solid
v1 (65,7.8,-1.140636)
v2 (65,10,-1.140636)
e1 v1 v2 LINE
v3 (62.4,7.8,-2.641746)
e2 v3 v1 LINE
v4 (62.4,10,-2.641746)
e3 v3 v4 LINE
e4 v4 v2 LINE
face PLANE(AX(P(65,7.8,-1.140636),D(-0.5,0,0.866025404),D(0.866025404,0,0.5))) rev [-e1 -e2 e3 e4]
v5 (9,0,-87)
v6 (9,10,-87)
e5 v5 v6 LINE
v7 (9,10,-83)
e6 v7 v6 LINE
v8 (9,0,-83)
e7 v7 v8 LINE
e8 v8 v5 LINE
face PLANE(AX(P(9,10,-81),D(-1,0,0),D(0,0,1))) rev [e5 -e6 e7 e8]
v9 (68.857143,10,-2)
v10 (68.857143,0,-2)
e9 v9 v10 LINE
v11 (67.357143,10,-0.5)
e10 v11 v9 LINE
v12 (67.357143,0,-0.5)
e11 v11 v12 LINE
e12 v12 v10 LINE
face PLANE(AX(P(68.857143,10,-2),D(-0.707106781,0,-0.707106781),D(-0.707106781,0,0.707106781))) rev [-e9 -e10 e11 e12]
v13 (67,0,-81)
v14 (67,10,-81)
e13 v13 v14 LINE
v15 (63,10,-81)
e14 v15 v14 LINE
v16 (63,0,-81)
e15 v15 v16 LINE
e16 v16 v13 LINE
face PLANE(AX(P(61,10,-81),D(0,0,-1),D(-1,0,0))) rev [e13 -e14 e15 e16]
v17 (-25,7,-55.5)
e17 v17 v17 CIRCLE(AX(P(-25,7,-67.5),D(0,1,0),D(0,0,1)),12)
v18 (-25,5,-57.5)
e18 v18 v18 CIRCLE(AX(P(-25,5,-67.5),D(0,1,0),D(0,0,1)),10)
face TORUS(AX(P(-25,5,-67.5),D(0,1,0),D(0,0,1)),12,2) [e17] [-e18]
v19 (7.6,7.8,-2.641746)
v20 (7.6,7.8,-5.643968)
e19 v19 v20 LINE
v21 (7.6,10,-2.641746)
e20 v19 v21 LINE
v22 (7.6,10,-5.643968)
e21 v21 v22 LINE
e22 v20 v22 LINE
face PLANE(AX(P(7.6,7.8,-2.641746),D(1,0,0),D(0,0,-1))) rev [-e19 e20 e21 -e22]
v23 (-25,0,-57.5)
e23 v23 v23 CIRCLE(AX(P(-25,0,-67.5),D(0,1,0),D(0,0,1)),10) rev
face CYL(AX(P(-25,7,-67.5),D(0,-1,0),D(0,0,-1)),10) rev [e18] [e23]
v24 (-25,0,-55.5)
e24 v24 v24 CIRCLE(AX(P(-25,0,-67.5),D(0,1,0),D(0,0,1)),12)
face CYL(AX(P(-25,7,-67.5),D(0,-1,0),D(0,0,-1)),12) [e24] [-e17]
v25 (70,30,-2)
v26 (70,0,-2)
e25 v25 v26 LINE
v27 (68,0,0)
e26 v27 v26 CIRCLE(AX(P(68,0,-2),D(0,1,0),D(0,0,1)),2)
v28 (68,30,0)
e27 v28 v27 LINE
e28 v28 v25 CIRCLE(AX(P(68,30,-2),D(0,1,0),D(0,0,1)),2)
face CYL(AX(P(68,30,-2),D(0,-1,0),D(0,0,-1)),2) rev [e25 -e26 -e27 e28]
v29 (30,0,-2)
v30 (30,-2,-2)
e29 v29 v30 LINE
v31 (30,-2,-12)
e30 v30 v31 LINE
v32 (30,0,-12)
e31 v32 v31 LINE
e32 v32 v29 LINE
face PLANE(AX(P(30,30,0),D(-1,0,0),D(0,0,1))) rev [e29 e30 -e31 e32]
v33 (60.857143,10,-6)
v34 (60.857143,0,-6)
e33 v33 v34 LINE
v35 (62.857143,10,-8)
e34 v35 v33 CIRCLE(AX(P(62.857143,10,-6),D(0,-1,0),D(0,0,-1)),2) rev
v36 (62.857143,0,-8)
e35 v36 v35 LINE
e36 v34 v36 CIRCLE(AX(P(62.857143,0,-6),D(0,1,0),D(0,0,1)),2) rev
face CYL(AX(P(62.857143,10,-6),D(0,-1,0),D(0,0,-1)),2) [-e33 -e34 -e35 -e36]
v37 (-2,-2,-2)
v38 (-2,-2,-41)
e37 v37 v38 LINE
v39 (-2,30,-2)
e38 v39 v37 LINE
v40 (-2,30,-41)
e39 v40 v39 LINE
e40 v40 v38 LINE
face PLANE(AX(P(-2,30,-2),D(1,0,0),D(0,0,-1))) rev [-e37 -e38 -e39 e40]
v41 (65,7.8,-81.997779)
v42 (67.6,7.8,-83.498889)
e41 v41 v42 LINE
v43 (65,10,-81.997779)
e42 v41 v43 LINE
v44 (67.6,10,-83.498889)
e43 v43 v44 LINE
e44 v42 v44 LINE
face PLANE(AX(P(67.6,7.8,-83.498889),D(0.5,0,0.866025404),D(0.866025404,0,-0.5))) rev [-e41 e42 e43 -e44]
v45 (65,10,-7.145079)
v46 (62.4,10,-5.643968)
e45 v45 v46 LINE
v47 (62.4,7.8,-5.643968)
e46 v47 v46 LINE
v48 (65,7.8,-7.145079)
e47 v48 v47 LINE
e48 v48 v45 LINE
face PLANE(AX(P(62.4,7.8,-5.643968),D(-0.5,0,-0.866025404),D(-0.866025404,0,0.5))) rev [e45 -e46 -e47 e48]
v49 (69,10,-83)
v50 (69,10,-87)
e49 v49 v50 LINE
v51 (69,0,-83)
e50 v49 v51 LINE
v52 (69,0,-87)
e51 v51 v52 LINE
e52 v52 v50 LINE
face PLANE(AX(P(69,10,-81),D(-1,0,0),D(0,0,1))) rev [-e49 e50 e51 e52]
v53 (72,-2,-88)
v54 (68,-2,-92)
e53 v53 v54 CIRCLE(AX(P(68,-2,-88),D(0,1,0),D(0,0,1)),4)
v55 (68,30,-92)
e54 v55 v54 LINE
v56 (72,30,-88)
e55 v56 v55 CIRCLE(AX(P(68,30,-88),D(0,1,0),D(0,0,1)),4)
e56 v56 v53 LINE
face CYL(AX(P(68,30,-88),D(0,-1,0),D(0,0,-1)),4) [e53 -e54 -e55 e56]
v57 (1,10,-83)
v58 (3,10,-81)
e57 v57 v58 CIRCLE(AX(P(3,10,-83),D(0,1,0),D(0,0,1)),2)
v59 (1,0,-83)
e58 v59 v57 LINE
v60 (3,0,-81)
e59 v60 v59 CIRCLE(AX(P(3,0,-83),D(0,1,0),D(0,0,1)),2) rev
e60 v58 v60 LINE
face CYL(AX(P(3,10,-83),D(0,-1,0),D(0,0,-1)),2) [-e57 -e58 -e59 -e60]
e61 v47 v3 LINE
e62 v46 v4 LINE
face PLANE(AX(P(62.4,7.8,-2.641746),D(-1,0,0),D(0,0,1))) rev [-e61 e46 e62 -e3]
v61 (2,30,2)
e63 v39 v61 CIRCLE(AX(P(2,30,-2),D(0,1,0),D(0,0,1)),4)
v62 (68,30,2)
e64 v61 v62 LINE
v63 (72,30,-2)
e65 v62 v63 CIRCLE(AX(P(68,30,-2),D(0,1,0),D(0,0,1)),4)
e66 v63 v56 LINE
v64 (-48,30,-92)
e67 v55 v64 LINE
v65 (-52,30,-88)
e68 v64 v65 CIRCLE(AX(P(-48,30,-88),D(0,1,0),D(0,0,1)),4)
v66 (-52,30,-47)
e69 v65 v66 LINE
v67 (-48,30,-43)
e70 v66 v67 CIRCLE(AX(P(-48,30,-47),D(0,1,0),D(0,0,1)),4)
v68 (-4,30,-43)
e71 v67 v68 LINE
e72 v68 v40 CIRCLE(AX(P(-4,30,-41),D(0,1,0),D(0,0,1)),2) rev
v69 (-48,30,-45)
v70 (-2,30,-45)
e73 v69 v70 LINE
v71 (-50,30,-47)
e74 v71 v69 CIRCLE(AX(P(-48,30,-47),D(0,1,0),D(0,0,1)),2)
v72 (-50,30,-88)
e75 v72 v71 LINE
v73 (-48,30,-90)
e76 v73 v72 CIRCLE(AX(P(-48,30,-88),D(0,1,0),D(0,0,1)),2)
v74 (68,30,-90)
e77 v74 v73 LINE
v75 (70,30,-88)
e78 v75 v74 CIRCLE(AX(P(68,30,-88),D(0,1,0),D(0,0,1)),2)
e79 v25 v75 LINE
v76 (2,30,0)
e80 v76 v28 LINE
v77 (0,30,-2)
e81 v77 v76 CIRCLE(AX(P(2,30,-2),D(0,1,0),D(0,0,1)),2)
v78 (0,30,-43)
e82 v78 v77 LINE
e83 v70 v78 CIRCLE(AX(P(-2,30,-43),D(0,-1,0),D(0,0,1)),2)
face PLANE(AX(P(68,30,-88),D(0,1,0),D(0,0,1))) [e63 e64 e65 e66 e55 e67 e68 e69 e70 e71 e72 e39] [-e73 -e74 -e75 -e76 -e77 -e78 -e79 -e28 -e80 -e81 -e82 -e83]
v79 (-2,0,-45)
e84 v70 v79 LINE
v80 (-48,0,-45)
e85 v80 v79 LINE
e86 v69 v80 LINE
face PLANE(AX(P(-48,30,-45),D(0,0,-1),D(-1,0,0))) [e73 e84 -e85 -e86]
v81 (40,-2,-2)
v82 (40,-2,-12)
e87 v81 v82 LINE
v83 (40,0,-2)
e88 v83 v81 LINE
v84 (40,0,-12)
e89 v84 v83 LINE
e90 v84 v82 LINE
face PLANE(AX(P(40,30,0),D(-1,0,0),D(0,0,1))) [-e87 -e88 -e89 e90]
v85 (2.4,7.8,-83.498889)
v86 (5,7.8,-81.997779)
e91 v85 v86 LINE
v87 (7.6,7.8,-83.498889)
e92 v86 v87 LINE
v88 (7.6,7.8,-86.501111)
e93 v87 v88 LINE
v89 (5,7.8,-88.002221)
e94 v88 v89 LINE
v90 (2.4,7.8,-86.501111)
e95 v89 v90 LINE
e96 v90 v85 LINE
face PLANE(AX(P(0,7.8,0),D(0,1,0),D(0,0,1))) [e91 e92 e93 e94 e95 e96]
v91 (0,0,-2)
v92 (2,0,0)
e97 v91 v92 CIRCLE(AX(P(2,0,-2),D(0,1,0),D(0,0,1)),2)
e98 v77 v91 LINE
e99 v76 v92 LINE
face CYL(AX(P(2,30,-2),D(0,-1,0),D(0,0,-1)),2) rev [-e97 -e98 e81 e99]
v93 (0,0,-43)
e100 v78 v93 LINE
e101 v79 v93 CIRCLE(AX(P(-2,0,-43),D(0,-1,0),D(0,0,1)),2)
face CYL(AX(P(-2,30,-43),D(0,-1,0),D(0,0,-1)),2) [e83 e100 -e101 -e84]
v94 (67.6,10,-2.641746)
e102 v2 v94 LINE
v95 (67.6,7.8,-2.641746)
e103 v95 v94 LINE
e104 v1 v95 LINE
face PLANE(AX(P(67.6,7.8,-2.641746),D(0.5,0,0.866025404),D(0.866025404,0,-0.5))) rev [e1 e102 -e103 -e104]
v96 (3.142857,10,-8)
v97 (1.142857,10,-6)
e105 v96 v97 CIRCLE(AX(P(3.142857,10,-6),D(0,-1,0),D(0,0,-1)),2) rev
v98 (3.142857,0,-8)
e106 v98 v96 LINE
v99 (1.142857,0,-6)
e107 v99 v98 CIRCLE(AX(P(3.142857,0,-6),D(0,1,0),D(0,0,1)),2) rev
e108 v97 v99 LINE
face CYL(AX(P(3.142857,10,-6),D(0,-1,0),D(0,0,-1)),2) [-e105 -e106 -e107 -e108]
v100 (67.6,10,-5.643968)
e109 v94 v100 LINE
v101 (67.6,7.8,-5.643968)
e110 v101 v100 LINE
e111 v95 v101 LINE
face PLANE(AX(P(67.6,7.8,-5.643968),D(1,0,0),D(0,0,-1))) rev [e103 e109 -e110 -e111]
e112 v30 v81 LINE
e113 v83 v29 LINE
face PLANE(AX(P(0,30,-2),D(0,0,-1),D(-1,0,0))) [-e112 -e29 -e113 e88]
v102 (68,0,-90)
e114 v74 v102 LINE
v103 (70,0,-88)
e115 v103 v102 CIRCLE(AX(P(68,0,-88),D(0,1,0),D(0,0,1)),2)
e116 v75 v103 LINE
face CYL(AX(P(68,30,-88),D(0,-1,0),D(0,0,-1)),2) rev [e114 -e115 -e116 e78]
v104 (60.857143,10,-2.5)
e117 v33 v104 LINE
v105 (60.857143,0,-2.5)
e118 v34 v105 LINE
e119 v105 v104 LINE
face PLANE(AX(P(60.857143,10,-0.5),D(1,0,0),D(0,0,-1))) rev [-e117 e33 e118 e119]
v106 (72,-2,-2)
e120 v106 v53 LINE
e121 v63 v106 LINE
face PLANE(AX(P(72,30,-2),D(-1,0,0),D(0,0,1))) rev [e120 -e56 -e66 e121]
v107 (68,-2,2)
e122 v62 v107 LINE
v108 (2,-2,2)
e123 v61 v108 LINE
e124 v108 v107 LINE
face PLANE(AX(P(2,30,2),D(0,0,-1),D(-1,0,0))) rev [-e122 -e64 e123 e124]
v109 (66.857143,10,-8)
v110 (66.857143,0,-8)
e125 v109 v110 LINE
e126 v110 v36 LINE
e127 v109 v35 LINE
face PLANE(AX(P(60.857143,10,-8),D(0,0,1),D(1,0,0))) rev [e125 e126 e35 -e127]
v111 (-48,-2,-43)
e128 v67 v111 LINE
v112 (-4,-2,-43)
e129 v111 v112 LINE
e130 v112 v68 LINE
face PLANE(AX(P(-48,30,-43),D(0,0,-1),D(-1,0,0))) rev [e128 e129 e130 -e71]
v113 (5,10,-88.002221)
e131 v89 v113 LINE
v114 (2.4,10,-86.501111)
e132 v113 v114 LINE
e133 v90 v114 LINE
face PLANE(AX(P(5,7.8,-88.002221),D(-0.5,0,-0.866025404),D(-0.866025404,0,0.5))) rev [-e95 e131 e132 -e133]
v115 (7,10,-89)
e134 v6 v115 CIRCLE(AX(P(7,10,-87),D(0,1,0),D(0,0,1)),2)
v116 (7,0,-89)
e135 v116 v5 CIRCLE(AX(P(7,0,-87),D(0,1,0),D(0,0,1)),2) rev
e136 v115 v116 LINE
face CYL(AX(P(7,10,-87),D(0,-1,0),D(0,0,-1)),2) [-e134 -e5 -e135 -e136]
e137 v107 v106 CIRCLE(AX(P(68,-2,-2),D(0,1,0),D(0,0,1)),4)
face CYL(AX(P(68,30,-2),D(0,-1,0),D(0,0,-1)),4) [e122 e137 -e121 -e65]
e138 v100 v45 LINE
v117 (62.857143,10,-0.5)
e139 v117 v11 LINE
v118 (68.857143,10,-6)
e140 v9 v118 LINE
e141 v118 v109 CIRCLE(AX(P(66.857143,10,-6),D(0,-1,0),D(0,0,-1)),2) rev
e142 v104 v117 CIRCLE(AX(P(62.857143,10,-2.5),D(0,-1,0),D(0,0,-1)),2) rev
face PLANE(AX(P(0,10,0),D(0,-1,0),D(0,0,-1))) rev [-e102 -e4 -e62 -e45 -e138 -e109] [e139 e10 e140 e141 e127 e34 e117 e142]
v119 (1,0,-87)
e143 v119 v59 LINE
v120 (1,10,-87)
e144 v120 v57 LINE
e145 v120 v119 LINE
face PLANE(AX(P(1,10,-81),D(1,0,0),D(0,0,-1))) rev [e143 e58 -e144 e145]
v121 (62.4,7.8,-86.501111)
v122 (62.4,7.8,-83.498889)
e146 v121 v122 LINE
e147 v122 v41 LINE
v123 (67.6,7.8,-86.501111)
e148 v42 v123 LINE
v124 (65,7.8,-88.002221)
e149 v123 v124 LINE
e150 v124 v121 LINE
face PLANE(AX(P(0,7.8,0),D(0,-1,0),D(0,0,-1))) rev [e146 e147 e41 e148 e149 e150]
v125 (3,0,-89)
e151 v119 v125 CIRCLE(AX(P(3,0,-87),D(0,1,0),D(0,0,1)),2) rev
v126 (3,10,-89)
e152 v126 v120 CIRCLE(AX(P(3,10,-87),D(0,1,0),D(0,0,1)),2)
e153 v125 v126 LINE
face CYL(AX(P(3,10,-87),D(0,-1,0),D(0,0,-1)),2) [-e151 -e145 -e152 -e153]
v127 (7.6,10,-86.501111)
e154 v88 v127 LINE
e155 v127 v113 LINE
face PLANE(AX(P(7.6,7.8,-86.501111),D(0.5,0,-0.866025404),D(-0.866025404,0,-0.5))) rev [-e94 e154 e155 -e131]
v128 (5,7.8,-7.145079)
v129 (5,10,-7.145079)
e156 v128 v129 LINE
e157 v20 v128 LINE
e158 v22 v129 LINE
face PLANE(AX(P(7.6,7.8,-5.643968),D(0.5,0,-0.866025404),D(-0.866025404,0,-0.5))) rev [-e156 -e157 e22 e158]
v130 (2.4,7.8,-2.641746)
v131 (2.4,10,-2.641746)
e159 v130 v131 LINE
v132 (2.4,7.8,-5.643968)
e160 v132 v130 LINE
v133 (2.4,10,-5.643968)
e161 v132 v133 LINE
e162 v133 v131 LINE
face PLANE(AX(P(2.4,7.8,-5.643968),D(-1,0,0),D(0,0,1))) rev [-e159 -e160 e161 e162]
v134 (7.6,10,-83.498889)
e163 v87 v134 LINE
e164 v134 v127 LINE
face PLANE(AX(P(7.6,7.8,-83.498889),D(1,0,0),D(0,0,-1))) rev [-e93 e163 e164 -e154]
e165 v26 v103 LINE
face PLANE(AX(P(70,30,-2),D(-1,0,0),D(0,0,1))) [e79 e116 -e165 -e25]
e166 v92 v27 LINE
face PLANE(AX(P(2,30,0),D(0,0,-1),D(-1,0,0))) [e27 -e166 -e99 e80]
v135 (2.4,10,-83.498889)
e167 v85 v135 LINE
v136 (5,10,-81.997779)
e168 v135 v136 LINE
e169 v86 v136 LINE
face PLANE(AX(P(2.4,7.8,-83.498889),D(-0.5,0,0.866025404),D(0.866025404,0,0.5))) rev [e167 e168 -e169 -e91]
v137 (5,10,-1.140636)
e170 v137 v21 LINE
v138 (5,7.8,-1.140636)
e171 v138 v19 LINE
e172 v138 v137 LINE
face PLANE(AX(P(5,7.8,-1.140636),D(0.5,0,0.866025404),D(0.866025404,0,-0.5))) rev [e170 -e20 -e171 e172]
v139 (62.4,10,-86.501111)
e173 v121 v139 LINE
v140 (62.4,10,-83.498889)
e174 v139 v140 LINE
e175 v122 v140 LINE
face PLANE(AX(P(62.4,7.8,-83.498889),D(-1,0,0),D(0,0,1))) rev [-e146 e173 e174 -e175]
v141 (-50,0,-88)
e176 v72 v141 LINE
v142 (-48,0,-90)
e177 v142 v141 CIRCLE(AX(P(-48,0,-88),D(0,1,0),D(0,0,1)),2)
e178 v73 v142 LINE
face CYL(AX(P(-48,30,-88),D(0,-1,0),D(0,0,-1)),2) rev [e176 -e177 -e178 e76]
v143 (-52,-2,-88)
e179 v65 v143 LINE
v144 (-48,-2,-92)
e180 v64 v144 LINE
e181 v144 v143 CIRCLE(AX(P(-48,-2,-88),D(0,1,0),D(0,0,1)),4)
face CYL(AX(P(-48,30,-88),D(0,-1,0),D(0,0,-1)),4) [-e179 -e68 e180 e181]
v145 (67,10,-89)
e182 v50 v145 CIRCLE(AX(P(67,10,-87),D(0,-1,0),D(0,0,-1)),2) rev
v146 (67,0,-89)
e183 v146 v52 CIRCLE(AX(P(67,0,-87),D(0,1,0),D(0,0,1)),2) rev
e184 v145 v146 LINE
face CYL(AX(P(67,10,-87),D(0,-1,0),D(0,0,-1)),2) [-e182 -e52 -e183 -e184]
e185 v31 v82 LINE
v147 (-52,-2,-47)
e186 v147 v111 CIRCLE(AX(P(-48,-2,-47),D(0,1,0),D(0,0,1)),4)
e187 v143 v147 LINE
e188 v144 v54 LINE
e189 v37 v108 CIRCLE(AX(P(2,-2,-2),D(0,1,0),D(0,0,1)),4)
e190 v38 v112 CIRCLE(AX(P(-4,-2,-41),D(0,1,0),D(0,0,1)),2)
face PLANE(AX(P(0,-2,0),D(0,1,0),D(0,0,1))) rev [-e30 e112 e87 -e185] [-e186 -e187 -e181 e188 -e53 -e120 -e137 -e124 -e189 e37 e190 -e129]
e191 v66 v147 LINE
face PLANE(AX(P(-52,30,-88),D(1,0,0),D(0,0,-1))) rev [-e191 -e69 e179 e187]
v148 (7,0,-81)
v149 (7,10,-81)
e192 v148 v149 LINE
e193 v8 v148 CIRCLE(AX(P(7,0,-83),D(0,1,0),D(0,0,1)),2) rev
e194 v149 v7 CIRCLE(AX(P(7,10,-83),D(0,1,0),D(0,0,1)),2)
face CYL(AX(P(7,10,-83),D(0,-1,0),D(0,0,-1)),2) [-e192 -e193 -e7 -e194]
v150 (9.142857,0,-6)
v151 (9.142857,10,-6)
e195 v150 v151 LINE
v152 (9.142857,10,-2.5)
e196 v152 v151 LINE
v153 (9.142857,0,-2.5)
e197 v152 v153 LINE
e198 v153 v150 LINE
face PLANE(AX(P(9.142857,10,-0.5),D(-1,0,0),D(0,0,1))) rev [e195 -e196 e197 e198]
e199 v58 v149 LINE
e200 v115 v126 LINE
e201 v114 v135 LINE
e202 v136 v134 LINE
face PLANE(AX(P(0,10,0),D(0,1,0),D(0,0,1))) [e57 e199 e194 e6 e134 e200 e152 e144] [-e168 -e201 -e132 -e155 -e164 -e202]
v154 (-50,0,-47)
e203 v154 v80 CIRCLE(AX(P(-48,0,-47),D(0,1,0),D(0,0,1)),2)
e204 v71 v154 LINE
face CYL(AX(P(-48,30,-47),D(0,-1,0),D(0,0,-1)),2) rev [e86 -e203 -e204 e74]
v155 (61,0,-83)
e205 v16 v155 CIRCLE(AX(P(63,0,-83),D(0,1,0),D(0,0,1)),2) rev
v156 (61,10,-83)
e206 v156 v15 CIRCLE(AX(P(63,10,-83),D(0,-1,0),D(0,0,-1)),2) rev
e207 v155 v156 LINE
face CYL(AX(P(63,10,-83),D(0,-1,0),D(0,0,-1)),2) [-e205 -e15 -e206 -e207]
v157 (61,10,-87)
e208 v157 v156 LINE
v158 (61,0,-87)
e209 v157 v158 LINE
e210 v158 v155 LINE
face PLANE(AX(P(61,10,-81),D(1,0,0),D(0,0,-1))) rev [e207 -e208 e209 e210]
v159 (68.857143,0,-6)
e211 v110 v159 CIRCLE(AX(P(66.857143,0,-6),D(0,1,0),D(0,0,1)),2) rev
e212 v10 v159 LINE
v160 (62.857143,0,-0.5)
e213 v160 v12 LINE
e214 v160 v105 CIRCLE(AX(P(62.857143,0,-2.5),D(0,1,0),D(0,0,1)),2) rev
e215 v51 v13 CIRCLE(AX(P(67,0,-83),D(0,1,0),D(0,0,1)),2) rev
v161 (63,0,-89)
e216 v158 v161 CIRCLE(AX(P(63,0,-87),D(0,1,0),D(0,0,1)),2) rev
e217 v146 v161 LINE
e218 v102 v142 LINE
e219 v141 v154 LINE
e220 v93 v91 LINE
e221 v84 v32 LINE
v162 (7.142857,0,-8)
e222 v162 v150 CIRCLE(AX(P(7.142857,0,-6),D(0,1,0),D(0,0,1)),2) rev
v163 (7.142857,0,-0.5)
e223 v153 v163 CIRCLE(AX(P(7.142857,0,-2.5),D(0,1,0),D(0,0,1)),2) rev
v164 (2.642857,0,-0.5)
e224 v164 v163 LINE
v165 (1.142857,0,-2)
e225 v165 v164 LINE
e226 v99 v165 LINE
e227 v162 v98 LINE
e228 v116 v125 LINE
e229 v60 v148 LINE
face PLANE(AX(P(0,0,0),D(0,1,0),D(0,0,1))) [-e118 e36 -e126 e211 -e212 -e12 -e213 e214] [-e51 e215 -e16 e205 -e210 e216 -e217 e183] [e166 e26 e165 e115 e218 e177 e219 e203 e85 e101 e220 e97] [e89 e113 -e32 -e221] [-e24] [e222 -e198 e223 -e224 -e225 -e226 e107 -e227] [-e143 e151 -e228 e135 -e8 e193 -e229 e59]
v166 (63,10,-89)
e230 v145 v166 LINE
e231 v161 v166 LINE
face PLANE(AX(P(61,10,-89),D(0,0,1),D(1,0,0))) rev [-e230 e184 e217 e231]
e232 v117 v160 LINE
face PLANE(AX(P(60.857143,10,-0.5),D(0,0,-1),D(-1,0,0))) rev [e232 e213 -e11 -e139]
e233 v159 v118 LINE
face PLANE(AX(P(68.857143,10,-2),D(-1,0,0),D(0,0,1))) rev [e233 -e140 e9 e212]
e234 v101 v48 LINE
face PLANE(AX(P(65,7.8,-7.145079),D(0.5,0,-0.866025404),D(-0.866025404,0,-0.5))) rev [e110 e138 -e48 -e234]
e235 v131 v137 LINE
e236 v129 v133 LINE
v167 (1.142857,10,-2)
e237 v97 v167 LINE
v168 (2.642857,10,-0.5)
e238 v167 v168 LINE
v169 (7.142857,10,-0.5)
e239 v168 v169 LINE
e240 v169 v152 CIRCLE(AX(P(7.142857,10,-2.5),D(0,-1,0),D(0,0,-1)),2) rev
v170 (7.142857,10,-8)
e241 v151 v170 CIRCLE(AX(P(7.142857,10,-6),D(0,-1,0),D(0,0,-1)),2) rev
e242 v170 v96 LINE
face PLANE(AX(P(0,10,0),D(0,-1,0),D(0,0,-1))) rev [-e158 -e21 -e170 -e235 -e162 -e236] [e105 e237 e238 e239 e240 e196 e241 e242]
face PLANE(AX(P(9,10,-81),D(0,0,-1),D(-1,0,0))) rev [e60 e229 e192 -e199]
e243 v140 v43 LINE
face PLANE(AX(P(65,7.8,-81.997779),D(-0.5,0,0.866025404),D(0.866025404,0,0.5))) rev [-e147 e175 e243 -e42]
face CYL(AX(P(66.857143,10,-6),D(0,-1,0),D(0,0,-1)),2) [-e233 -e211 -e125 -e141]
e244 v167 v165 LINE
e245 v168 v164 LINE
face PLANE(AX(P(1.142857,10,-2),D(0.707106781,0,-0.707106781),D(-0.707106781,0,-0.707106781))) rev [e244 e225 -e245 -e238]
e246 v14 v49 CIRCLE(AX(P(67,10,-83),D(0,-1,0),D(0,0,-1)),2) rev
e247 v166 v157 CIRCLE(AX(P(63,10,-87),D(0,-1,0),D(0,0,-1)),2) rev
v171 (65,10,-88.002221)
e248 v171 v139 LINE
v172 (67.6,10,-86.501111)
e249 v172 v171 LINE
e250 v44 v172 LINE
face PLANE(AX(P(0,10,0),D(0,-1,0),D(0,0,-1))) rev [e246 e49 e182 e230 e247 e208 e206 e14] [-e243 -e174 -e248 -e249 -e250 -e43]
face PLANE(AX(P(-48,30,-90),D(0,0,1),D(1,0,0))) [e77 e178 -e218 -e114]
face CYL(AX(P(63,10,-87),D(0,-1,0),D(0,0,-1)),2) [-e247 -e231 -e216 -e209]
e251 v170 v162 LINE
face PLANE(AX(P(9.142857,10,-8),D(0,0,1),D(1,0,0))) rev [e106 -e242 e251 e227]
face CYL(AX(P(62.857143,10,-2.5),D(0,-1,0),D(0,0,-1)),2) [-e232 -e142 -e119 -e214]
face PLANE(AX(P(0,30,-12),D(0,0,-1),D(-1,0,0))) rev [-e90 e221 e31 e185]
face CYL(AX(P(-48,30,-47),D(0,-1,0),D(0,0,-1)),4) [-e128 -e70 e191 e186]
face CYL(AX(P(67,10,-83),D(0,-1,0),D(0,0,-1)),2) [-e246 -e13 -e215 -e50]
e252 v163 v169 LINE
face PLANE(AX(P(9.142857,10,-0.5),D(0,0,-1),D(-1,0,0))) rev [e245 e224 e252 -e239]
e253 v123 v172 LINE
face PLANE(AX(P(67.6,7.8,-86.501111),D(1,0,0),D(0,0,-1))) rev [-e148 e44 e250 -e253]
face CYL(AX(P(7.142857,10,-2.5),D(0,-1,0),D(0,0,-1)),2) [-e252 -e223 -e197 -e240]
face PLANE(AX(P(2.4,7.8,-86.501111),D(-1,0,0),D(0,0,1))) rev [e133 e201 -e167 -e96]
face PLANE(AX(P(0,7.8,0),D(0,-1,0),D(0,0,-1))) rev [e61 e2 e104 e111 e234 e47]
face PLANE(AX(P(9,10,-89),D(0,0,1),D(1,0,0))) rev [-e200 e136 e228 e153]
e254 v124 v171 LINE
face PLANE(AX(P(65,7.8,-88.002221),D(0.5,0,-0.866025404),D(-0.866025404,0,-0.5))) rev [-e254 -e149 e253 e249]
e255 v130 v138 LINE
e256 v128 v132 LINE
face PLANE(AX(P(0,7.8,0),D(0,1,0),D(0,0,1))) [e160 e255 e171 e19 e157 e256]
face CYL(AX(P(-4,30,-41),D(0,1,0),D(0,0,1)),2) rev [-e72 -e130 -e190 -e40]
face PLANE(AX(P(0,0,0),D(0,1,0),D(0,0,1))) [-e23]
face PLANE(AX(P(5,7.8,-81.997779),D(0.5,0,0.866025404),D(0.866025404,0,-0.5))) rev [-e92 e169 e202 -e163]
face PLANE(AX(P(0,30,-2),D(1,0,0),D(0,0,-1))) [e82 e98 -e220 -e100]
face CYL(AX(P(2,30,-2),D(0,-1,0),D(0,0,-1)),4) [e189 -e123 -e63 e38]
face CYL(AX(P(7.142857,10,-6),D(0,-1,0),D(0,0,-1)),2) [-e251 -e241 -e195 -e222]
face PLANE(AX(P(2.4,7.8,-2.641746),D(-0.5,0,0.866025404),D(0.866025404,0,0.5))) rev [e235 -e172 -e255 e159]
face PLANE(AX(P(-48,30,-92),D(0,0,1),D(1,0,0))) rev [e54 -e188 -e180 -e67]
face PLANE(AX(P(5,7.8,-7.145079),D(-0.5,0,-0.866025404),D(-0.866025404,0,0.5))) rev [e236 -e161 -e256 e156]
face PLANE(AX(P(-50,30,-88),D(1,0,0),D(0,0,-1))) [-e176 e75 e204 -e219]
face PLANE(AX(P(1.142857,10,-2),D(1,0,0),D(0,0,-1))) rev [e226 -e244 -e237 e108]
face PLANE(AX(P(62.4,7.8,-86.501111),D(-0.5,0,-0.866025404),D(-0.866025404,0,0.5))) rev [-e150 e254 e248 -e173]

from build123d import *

# Parameters (mm, degrees)
BOSS_EXTRUDE1_DEPTH = 30
BOSS_EXTRUDE2_DEPTH = 2
SKETCH5_R           = 12
SKETCH5_R_2         = 10
BOSS_EXTRUDE3_DEPTH = 7
SKETCH6_W           = 8
SKETCH6_H           = 8
BOSS_EXTRUDE4_DEPTH = 10
CUT_EXTRUDE1_START  = 10
CUT_EXTRUDE1_DEPTH  = 2.2
FILLET1_R           = 2
SKETCH8_W           = 10
SKETCH8_H           = 10
CUT_EXTRUDE3_DEPTH  = 122.128031438


with BuildPart() as part:
    # Sketch2 → Boss-Extrude1 (new body)
    with BuildSketch(Plane(origin=(0, 0, 0), x_dir=(1, 0, 0), z_dir=(0, 1, 0))):
        with BuildLine():
            Line((72, 2), (72, 88))
            ThreePointArc((72, 88), (70.828427125, 90.828427125), (68, 92))
            Line((68, 92), (-48, 92))
            ThreePointArc((-48, 92), (-50.828427125, 90.828427125), (-52, 88))
            Line((-52, 88), (-52, 47))
            ThreePointArc((-52, 47), (-50.828427125, 44.171572875), (-48, 43))
            Line((-48, 43), (-2, 43))
            Line((-2, 43), (-2, 2))
            ThreePointArc((-2, 2), (-0.828427125, -0.828427125), (2, -2))
            Line((2, -2), (68, -2))
            ThreePointArc((68, -2), (70.828427125, -0.828427125), (72, 2))
        make_face()
        with BuildLine():
            Line((70, 2), (70, 88))
            ThreePointArc((70, 88), (69.414213562, 89.414213562), (68, 90))
            Line((68, 90), (-48, 90))
            ThreePointArc((-48, 90), (-49.414213562, 89.414213562), (-50, 88))
            Line((-50, 88), (-50, 47))
            ThreePointArc((-50, 47), (-49.414213562, 45.585786438), (-48, 45))
            Line((-48, 45), (-2, 45))
            ThreePointArc((-2, 45), (-0.585786438, 44.414213562), (0, 43))
            Line((0, 43), (0, 2))
            ThreePointArc((0, 2), (0.585786438, 0.585786438), (2, 0))
            Line((2, 0), (68, 0))
            ThreePointArc((68, 0), (69.414213562, 0.585786438), (70, 2))
        make_face(mode=Mode.SUBTRACT)
    extrude(amount=BOSS_EXTRUDE1_DEPTH)



with BuildPart() as body_2:
    # Sketch3 → Boss-Extrude2 (new body)
    # profile 1 of 2: a face of its own
    with BuildSketch(Plane(origin=(0, 0, 0), x_dir=(1, 0, 0), z_dir=(0, 1, 0))):
        with BuildLine():
            Line((-48, 92), (68, 92))
            ThreePointArc((68, 92), (70.828427125, 90.828427125), (72, 88))
            Line((72, 88), (72, 2))
            ThreePointArc((72, 2), (70.828427125, -0.828427125), (68, -2))
            Line((68, -2), (2, -2))
            ThreePointArc((2, -2), (-0.828427125, -0.828427125), (-2, 2))
            Line((-2, 2), (-2, 43))
            Line((-2, 43), (-48, 43))
            ThreePointArc((-48, 43), (-50.828427125, 44.171572875), (-52, 47))
            Line((-52, 47), (-52, 88))
            ThreePointArc((-52, 88), (-50.828427125, 90.828427125), (-48, 92))
        make_face()
        with BuildLine():
            Line((0, 43), (0, 2))
            ThreePointArc((0, 2), (0.585786438, 0.585786438), (2, 0))
            Line((2, 0), (68, 0))
            ThreePointArc((68, 0), (69.414213562, 0.585786438), (70, 2))
            Line((70, 2), (70, 88))
            ThreePointArc((70, 88), (69.414213562, 89.414213562), (68, 90))
            Line((68, 90), (-48, 90))
            ThreePointArc((-48, 90), (-49.414213562, 89.414213562), (-50, 88))
            Line((-50, 88), (-50, 47))
            ThreePointArc((-50, 47), (-49.414213562, 45.585786438), (-48, 45))
            Line((-48, 45), (-2, 45))
            ThreePointArc((-2, 45), (-0.585786438, 44.414213562), (0, 43))
        make_face(mode=Mode.SUBTRACT)
    # profile 2 of 2: a face of its own
    with BuildSketch(Plane(origin=(0, 0, 0), x_dir=(1, 0, 0), z_dir=(0, 1, 0))):
        with BuildLine():
            ThreePointArc((0, 43), (-0.585786438, 44.414213562), (-2, 45))
            Line((-2, 45), (-48, 45))
            ThreePointArc((-48, 45), (-49.414213562, 45.585786438), (-50, 47))
            Line((-50, 47), (-50, 88))
            ThreePointArc((-50, 88), (-49.414213562, 89.414213562), (-48, 90))
            Line((-48, 90), (68, 90))
            ThreePointArc((68, 90), (69.414213562, 89.414213562), (70, 88))
            Line((70, 88), (70, 2))
            ThreePointArc((70, 2), (69.414213562, 0.585786438), (68, 0))
            Line((68, 0), (2, 0))
            ThreePointArc((2, 0), (0.585786438, 0.585786438), (0, 2))
            Line((0, 2), (0, 43))
        make_face()
    extrude(amount=-BOSS_EXTRUDE2_DEPTH)


with BuildPart() as part_1:
    add(part.part)

    add(body_2.part)  # Boss-Extrude3 merges body 2
    # Sketch5 → Boss-Extrude3 (add)
    with BuildSketch(Plane(origin=(0, 0, 0), x_dir=(1, 0, 0), z_dir=(0, 1, 0))):
        with Locations(Location((-25, 67.5, 0), (0, 0, 270))):
            Circle(SKETCH5_R)
        with Locations(Location((-25, 67.5, 0), (0, 0, 270))):
            Circle(SKETCH5_R_2, mode=Mode.SUBTRACT)
    extrude(amount=BOSS_EXTRUDE3_DEPTH)

    # Sketch6 → Boss-Extrude4 (add)
    with BuildSketch(Plane(origin=(0, 0, 0), x_dir=(1, 0, 0), z_dir=(0, 1, 0))):
        with Locations((65, 85)):
            Rectangle(SKETCH6_W, SKETCH6_H)
        Polygon((60.857142857, 8), (68.857142857, 8), (68.857142857, 2), (67.357142857, 0.5), (60.857142857, 0.5), align=None)
        Polygon((9.142857143, 0.5), (9.142857143, 8), (1.142857143, 8), (1.142857143, 2), (2.642857143, 0.5), align=None)
        with Locations((5, 85)):
            Rectangle(SKETCH6_W, SKETCH6_H)
    extrude(amount=BOSS_EXTRUDE4_DEPTH)

    # Sketch7 → Cut-Extrude1 (cut)
    with BuildSketch(Plane(origin=(0, 0, 0), x_dir=(1, 0, 0), z_dir=(0, 1, 0)).offset(CUT_EXTRUDE1_START)):
        Polygon((2.4, 86.5011107), (2.4, 83.4988893), (5, 81.9977786), (7.6, 83.4988893), (7.6, 86.5011107), (5, 88.0022214), align=None)
        Polygon((2.4, 5.643967843), (2.4, 2.641746443), (5, 1.140635743), (7.6, 2.641746443), (7.6, 5.643967843), (5, 7.145078543), align=None)
        Polygon((65, 1.140635743), (62.4, 2.641746443), (62.4, 5.643967843), (65, 7.145078543), (67.6, 5.643967843), (67.6, 2.641746443), align=None)
        Polygon((62.4, 86.5011107), (65, 88.0022214), (67.6, 86.5011107), (67.6, 83.4988893), (65, 81.9977786), (62.4, 83.4988893), align=None)
    extrude(amount=-CUT_EXTRUDE1_DEPTH, mode=Mode.SUBTRACT)

    # Fillet1
    fillet1_edges = [part_1.edges().sort_by_distance(p)[0] for p in [
        (61, 5, -89),
        (61, 5, -81),
        (69, 5, -81),
        (69, 5, -89),
        (60.857142857, 5, -8),
        (60.857142857, 5, -0.5),
        (68.857142857, 5, -8),
        (9.142857143, 5, -8),
        (1.142857143, 5, -8),
        (9.142857143, 5, -0.5),
        (9, 5, -81),
        (9, 5, -89),
        (1, 5, -89),
        (1, 5, -81),
        (-2, 14, -43),
        (-25, 7, -77.5),
    ]]
    fillet(fillet1_edges, radius=FILLET1_R - 0.0001)  # a hair under: the kernel refuses the full size

    # Sketch8 → Cut-Extrude3 (cut, through all)
    with BuildSketch(Plane.XZ.offset(2)):
        with Locations((35, -7)):
            Rectangle(SKETCH8_W, SKETCH8_H)
    extrude(amount=-CUT_EXTRUDE3_DEPTH, mode=Mode.SUBTRACT)


solid = part_1.part
